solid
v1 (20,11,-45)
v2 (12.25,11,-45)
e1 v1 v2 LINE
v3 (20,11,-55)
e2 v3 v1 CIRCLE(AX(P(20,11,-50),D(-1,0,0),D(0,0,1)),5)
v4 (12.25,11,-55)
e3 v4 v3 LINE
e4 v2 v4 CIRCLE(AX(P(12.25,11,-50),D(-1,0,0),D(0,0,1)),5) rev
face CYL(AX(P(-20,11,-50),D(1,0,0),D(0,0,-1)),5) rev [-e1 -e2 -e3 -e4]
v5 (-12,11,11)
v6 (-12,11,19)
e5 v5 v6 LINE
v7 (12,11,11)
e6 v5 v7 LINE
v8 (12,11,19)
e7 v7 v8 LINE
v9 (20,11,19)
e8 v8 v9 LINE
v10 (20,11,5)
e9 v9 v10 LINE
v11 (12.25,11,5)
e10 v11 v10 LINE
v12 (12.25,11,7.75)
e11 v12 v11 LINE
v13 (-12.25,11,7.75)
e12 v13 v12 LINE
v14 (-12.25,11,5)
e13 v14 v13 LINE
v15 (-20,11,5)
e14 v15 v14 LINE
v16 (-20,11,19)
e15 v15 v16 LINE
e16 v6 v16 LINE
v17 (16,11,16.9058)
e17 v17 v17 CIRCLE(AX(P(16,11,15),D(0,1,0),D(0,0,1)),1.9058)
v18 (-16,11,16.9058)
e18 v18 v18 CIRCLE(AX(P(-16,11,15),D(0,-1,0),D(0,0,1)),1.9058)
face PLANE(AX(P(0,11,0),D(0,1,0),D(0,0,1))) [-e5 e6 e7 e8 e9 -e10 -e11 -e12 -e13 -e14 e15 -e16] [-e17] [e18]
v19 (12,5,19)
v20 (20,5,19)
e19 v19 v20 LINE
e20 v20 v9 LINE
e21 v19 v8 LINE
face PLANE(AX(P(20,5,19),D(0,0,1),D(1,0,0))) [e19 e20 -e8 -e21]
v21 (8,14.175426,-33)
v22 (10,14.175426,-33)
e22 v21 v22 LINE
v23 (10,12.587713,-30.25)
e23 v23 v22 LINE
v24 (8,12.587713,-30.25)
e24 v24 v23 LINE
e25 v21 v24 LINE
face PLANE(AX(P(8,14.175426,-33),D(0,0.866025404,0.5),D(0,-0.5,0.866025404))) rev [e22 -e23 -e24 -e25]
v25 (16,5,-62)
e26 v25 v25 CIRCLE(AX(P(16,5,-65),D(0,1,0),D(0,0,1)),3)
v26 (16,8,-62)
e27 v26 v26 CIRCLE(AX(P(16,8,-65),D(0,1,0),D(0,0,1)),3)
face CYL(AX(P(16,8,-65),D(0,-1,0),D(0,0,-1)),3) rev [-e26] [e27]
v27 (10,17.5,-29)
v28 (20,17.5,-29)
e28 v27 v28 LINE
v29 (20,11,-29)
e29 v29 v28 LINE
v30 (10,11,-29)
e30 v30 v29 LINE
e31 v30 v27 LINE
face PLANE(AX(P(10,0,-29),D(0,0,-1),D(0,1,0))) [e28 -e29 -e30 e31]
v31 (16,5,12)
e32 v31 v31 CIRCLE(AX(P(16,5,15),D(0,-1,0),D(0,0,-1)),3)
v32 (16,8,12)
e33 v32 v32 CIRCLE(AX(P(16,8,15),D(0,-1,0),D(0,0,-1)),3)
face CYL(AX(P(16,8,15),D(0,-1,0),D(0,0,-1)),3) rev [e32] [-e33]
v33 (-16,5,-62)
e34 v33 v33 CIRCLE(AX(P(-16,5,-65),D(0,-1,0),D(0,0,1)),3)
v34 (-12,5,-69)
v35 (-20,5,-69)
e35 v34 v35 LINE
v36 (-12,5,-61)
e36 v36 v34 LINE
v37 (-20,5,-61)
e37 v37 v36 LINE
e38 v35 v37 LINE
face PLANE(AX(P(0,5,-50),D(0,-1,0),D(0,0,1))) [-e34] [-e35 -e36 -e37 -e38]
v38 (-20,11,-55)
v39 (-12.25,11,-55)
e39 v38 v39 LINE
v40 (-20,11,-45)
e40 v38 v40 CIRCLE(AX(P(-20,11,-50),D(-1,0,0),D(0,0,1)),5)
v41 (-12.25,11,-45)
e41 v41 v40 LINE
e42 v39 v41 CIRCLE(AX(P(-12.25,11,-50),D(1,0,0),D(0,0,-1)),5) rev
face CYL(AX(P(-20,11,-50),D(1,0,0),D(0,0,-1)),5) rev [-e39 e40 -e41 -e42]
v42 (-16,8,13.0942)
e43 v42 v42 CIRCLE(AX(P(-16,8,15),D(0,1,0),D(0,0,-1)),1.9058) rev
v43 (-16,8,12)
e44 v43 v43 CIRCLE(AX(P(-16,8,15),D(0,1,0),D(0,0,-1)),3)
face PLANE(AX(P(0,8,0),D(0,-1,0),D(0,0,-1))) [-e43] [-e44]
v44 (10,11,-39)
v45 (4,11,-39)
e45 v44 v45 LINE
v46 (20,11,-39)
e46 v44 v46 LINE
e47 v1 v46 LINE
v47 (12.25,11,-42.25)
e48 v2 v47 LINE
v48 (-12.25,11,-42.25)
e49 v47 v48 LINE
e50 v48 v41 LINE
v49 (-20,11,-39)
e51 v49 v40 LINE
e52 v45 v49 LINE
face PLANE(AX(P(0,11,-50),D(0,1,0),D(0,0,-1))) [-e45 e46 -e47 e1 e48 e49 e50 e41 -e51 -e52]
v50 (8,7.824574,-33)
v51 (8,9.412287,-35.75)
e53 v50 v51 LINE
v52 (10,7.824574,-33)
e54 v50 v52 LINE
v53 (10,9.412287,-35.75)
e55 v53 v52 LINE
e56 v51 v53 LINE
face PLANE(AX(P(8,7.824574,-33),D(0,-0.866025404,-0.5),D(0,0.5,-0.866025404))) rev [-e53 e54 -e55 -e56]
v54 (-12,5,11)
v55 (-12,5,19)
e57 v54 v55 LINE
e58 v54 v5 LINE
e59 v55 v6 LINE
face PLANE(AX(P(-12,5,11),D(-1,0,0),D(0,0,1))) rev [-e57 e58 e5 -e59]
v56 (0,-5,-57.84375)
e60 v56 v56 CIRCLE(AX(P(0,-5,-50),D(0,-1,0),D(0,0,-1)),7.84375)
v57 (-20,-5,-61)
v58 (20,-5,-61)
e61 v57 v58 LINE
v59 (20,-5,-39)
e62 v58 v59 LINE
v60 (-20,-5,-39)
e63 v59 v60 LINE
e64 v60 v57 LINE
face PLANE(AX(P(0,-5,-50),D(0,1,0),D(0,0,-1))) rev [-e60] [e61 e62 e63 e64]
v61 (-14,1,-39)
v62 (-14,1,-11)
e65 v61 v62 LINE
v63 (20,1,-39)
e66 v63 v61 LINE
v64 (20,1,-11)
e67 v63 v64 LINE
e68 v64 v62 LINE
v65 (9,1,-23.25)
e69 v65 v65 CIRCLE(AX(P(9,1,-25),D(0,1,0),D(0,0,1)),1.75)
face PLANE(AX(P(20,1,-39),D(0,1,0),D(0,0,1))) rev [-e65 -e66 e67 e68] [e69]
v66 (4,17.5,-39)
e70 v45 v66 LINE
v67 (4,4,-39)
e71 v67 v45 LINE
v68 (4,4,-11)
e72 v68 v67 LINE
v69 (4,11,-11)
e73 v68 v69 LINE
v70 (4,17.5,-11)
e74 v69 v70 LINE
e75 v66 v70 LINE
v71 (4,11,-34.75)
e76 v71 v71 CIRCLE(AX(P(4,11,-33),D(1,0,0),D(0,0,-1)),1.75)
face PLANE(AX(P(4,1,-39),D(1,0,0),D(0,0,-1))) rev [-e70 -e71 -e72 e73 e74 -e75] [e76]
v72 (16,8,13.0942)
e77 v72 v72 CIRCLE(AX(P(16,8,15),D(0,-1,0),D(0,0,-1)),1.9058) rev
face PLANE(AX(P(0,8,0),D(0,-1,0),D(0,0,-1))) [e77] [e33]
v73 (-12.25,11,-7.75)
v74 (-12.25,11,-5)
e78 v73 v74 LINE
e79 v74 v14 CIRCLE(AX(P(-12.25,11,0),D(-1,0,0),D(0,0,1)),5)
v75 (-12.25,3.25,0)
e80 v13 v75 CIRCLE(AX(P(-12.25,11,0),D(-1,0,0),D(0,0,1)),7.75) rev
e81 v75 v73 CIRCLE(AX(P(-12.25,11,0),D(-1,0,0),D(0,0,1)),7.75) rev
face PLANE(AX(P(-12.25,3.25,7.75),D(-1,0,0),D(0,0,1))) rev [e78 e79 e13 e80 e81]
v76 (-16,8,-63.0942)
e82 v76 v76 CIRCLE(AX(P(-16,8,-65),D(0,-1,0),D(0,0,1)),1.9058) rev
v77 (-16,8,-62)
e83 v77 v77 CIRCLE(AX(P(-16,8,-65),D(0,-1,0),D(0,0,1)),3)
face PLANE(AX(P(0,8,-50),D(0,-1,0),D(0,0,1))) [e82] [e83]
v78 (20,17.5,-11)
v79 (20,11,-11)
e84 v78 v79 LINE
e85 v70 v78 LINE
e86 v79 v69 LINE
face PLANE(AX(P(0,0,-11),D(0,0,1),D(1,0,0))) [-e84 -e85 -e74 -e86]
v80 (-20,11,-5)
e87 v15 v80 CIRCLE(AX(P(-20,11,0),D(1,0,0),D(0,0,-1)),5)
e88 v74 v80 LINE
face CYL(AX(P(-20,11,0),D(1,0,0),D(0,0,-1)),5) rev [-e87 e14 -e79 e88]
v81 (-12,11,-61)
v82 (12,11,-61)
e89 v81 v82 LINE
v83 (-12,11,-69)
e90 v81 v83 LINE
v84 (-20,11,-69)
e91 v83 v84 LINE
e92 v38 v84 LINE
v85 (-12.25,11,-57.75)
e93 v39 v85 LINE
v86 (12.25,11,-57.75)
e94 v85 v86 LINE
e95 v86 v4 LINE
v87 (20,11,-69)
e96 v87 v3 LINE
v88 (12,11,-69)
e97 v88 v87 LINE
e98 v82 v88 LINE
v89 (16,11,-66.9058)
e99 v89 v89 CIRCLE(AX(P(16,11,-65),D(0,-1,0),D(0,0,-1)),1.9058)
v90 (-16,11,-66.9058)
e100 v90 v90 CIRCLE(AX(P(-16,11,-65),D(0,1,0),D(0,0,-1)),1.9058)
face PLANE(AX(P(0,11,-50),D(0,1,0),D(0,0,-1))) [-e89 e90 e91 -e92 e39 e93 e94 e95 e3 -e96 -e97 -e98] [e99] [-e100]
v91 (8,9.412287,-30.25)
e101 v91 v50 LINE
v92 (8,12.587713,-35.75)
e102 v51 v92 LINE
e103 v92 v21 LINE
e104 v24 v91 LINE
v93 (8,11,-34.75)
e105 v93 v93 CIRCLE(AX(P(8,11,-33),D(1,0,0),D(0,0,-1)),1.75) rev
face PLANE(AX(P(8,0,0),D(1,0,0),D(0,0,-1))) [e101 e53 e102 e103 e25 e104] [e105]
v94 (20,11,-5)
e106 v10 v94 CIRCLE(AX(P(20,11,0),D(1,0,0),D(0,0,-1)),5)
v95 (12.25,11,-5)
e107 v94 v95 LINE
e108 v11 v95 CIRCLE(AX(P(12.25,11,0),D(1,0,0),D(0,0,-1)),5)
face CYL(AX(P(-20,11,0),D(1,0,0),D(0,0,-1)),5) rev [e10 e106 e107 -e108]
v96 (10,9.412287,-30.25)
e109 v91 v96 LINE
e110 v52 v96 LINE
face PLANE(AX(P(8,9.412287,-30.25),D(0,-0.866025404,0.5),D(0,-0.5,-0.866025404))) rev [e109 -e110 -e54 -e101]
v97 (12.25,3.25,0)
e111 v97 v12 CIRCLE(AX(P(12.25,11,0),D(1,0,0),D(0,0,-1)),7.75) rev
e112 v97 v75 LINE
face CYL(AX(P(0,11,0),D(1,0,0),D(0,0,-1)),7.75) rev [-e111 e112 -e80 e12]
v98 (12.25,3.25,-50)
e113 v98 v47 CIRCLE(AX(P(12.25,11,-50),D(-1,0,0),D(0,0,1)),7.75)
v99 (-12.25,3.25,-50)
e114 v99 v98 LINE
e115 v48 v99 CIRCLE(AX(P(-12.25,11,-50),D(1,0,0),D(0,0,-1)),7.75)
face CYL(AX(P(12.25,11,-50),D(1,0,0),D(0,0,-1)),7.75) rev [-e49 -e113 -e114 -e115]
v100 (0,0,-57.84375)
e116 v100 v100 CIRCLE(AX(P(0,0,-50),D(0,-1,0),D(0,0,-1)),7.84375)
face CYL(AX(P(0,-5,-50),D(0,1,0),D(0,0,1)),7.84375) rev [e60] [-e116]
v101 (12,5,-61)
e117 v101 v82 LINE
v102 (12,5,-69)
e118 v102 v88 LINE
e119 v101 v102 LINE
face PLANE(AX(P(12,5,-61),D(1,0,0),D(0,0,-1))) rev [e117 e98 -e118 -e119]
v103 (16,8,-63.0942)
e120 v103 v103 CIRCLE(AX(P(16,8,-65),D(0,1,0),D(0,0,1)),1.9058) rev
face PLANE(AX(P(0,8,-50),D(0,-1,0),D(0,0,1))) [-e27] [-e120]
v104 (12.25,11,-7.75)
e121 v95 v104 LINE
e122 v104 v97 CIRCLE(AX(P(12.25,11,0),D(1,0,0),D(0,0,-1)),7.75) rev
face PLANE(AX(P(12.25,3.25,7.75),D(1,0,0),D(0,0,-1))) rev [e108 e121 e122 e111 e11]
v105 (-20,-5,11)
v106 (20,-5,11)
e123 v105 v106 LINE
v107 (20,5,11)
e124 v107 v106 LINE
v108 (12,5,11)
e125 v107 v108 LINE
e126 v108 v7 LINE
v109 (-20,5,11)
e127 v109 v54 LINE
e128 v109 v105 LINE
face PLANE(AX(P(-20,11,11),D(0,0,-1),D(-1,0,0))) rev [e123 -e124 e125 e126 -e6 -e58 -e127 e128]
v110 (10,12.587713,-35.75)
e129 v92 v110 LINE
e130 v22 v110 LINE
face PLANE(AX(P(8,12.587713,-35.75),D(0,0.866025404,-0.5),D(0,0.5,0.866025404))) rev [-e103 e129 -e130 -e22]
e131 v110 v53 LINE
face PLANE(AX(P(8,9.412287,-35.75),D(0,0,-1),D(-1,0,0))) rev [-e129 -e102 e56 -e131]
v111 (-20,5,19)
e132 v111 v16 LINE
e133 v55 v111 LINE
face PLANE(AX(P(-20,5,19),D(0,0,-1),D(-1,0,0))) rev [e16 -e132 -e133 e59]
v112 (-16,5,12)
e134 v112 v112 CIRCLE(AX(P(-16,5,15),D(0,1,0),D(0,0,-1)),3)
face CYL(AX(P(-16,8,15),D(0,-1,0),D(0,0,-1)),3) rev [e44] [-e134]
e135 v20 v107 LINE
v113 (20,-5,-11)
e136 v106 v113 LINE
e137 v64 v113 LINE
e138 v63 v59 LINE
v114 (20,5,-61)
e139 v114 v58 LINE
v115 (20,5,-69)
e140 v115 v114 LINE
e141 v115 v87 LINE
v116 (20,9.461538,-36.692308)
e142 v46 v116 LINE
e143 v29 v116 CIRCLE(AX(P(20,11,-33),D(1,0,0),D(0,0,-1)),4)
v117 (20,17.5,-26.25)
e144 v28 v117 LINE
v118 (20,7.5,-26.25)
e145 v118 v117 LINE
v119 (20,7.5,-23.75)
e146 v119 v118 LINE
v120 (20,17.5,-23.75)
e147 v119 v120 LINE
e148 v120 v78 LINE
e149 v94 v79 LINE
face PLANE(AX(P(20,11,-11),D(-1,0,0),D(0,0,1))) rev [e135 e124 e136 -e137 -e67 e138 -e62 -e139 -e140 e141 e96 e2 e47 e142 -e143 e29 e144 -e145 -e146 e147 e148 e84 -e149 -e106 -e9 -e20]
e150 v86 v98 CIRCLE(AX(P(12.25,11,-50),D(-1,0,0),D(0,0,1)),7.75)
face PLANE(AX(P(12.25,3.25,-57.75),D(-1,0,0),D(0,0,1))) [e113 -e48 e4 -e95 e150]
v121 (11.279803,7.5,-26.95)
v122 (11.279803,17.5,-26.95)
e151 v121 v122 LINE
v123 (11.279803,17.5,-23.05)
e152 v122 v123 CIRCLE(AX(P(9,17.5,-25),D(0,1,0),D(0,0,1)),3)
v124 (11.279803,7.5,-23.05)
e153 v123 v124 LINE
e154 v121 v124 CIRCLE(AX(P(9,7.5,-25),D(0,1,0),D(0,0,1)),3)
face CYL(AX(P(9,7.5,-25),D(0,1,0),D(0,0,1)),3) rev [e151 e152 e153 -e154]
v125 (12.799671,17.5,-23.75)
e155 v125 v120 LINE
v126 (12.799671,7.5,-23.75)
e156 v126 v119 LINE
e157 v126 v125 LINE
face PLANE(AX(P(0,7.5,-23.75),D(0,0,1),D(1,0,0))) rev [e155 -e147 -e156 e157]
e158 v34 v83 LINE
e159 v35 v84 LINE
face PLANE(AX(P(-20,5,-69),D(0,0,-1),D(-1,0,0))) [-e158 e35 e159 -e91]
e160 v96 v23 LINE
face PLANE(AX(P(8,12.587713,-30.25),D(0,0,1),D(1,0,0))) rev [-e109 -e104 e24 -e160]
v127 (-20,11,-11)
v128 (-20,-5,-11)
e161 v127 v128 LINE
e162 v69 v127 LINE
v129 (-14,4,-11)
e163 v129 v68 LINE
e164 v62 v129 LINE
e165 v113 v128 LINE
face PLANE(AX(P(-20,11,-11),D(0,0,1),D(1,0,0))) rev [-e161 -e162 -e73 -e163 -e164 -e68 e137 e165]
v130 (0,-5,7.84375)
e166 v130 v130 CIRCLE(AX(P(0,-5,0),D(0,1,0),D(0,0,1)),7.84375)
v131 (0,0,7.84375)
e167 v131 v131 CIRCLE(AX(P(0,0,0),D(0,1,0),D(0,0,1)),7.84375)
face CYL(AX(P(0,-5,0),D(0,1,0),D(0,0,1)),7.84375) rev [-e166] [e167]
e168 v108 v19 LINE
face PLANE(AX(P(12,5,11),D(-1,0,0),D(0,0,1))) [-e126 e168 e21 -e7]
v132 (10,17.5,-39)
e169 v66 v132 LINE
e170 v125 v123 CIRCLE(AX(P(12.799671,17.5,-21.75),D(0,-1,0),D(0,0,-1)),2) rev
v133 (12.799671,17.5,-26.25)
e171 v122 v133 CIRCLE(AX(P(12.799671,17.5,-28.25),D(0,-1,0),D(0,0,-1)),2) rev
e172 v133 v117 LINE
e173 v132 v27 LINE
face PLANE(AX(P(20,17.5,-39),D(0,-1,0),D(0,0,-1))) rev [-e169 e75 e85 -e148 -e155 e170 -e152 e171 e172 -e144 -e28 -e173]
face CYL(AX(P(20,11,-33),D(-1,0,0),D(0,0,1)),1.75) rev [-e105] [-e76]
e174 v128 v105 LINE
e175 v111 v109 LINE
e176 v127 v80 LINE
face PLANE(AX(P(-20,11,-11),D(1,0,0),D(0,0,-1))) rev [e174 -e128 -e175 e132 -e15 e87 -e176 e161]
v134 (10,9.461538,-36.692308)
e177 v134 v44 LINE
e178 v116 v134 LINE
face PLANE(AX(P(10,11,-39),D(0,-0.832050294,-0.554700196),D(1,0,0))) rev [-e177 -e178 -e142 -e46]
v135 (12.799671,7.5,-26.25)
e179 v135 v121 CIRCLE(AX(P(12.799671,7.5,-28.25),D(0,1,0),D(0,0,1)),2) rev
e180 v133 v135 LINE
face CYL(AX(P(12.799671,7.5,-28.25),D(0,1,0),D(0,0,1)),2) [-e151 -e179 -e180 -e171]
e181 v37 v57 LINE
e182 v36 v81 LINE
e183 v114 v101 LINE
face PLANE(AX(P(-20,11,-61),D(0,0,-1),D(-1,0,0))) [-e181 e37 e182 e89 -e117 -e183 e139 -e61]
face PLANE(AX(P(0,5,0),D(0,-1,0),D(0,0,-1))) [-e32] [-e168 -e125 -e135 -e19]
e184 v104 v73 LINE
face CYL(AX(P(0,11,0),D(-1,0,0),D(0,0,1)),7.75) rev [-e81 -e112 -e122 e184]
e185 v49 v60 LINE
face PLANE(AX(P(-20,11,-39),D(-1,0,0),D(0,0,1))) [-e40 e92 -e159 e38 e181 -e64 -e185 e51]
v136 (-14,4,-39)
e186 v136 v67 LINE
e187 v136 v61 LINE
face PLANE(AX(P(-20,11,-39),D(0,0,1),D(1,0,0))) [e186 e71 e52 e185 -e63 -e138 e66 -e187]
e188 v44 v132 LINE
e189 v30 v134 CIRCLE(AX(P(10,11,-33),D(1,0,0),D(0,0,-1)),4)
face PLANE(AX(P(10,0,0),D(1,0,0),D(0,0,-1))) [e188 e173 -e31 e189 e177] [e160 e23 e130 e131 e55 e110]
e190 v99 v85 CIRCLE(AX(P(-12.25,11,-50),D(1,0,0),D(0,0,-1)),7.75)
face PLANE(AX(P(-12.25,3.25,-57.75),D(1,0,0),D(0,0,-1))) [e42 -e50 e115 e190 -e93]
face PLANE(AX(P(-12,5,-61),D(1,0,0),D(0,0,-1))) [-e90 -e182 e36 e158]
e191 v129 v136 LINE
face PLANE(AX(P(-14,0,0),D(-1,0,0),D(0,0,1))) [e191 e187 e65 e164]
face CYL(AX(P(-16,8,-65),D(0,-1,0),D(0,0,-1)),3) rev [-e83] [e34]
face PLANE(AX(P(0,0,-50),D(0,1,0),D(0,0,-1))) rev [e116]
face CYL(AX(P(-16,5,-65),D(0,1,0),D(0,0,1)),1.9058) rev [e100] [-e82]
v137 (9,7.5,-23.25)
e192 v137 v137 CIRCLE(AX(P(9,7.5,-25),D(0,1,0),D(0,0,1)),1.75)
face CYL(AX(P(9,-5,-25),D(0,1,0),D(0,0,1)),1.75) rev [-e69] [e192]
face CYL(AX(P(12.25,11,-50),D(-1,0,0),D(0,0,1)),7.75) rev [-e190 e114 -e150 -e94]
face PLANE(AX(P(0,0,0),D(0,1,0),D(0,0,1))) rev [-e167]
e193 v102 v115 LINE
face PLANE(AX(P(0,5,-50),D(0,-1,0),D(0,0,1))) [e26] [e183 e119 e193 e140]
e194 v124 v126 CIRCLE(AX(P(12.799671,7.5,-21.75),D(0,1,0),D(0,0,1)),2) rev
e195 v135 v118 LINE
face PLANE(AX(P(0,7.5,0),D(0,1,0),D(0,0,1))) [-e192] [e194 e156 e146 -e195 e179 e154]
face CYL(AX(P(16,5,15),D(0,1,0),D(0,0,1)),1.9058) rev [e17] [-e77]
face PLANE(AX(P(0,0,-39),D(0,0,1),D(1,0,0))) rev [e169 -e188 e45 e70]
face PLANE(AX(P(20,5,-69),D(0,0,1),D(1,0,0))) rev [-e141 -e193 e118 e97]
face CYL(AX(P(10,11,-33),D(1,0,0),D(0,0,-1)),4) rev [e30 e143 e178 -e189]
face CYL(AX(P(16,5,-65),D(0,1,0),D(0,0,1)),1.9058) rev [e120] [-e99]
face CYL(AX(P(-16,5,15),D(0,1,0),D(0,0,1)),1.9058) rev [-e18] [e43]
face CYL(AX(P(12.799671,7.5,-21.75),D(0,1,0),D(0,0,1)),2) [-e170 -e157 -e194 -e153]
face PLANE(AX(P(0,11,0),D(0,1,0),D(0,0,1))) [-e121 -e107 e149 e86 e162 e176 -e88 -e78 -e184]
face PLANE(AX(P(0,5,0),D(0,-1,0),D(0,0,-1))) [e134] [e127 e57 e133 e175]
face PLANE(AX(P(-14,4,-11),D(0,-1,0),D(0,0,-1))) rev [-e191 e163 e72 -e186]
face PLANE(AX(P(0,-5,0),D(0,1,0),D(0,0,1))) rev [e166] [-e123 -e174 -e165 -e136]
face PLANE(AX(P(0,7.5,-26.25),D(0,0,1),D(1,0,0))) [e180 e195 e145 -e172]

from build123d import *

# Parameters (mm, degrees)
SKETCH1_W                  = 40
SKETCH1_H                  = 22
BOSS_EXTRUDE1_DEPTH        = 11
SKETCH2_W                  = 40
SKETCH2_H                  = 22
SKETCH2_R                  = 7.843750423
BOSS_EXTRUDE2_DEPTH        = 5
SKETCH3_W                  = 24.5
SKETCH3_H                  = 15.5
CUT_EXTRUDE1_DEPTH         = 7.75
FILLET1_R                  = 7.75
SKETCH4_R                  = 5
CUT_EXTRUDE2_DEPTH         = 36.805900352
SKETCH5_W                  = 8
SKETCH5_H                  = 8
SKETCH5_R                  = 1.905800151
BOSS_EXTRUDE3_DEPTH        = 6
CUT_EXTRUDE3_START         = -3
SKETCH6_R                  = 3
SKETCH6_R_2                = 1.905800151
CUT_EXTRUDE3_DEPTH         = 3
SKETCH7_W                  = 16
SKETCH7_H                  = 16.5
BOSS_EXTRUDE5_DEPTH        = 28
MIRROR14_COPY_1_SKETCH_W   = 8
MIRROR14_COPY_1_SKETCH_H   = 8
MIRROR14_COPY_1_SKETCH_R   = 1.905800151
MIRROR14_COPY_1_DEPTH      = 6
MIRROR14_START             = -3
MIRROR14_COPY_2_SKETCH_R   = 3
MIRROR14_COPY_2_SKETCH_R_2 = 1.905800151
MIRROR14_COPY_2_DEPTH      = 3
FILLET1_OF_MIRROR14_R      = 7.75
SKETCH9_W                  = 28
SKETCH9_H                  = 3
BOSS_EXTRUDE6_DEPTH        = 18
CUT_EXTRUDE4_DEPTH         = 10
CUT_EXTRUDE5_DEPTH         = 73.919476136
CUT_EXTRUDE5_DEPTH_BACK    = 73.919476136
SKETCH11_R                 = 1.75
CUT_EXTRUDE6_DEPTH         = 76.121568141
CUT_EXTRUDE6_DEPTH_BACK    = 76.121568141
SKETCH12_R                 = 1.75
CUT_EXTRUDE9_DEPTH         = 12
CUT_EXTRUDE11_START        = -10
SKETCH16_R                 = 4
SKETCH16_R_2               = 1.75
SKETCH16_W                 = 10
SKETCH16_H                 = 6.5
CUT_EXTRUDE11_DEPTH        = 10
FILLET2_R                  = 2


# Some blends are built 0.0001 mm under size
with BuildPart() as part:
    # Sketch1 → Boss-Extrude1 (new body)
    with BuildSketch(Plane(origin=(0, 0, 0), x_dir=(1, 0, 0), z_dir=(0, 1, 0))):
        Rectangle(SKETCH1_W, SKETCH1_H)
    boss_extrude1 = extrude(amount=BOSS_EXTRUDE1_DEPTH)

    # Sketch2 → Boss-Extrude2 (add)
    with BuildSketch(Plane(origin=(0, 0, 0), x_dir=(1, 0, 0), z_dir=(0, 1, 0))):
        Rectangle(SKETCH2_W, SKETCH2_H)
        with Locations(Location((0, 0, 0), (0, 0, 270))):
            Circle(SKETCH2_R, mode=Mode.SUBTRACT)
    boss_extrude2 = extrude(amount=-BOSS_EXTRUDE2_DEPTH)

    # Sketch3 → Cut-Extrude1 (cut)
    with BuildSketch(Plane(origin=(0, 11, 0), x_dir=(1, 0, 0), z_dir=(0, 1, 0))):
        Rectangle(SKETCH3_W, SKETCH3_H)
    cut_extrude1 = extrude(amount=-CUT_EXTRUDE1_DEPTH, mode=Mode.SUBTRACT)

    # Fillet1
    fillet1_edges = [part.edges().sort_by_distance(p)[0] for p in [
        (0, 3.25, 7.75),
        (0, 3.25, -7.75),
    ]]
    fillet(fillet1_edges, radius=FILLET1_R - 0.0001)  # a hair under: the kernel refuses the full size

    # Sketch4 → Cut-Extrude2 (cut, symmetric)
    with BuildSketch(Plane(origin=(-12.25, 0, 0), x_dir=(0, 0, -1), z_dir=(1, 0, 0))):
        with Locations((0, 11)):
            Circle(SKETCH4_R)
    cut_extrude2 = extrude(amount=CUT_EXTRUDE2_DEPTH, both=True, mode=Mode.SUBTRACT)

    # Sketch5 → Boss-Extrude3 (add)
    with BuildSketch(Plane(origin=(0, 11, 0), x_dir=(1, 0, 0), z_dir=(0, 1, 0))):
        with Locations((16, -15)):
            Rectangle(SKETCH5_W, SKETCH5_H)
        with Locations(Location((16, -15, 0), (0, 0, 270))):
            Circle(SKETCH5_R, mode=Mode.SUBTRACT)
    boss_extrude3 = extrude(amount=-BOSS_EXTRUDE3_DEPTH)

    # Sketch6 → Cut-Extrude3 (cut)
    with BuildSketch(Plane.XZ.offset(-5).offset(CUT_EXTRUDE3_START)):
        with Locations(Location((16, 15, 0), (0, 0, 270))):
            Circle(SKETCH6_R)
        with Locations(Location((16, 15, 0), (0, 0, 90))):
            Circle(SKETCH6_R_2, mode=Mode.SUBTRACT)
    cut_extrude3 = extrude(amount=CUT_EXTRUDE3_DEPTH, mode=Mode.SUBTRACT)

    # Mirror8: Boss-Extrude3, Cut-Extrude3 across plane
    add(boss_extrude3.mirror(Plane(origin=(0, 0, 0), x_dir=(0, 0, 1), z_dir=(1, 0, 0))))
    add(cut_extrude3.mirror(Plane(origin=(0, 0, 0), x_dir=(0, 0, 1), z_dir=(1, 0, 0))), mode=Mode.SUBTRACT)

    # Sketch7 → Boss-Extrude5 (add)
    with BuildSketch(Plane(origin=(0, 0, -11), x_dir=(-1, 0, 0), z_dir=(0, 0, -1))):
        with Locations((-12, 9.25)):
            Rectangle(SKETCH7_W, SKETCH7_H)
    extrude(amount=BOSS_EXTRUDE5_DEPTH)

    # Mirror14: Boss-Extrude1, Boss-Extrude2, Cut-Extrude1, Cut-Extrude2, Boss-Extrude3, Cut-Extrude3 across plane
    add(boss_extrude1.mirror(Plane.XY.offset(-25)))
    add(boss_extrude2.mirror(Plane.XY.offset(-25)))
    add(cut_extrude1.mirror(Plane.XY.offset(-25)), mode=Mode.SUBTRACT)
    add(cut_extrude2.mirror(Plane.XY.offset(-25)), mode=Mode.SUBTRACT)
    add(boss_extrude3.mirror(Plane.XY.offset(-25)))
    add(cut_extrude3.mirror(Plane.XY.offset(-25)), mode=Mode.SUBTRACT)

    # Mirror14 copy 1 sketch → Mirror14 copy 1 (add)
    with BuildSketch(Plane(origin=(0, 11, -50), x_dir=(-1, 0, 0), z_dir=(0, 1, 0))):
        with Locations((16, -15)):
            Rectangle(MIRROR14_COPY_1_SKETCH_W, MIRROR14_COPY_1_SKETCH_H)
        with Locations(Location((16, -15, 0), (0, 0, 270))):
            Circle(MIRROR14_COPY_1_SKETCH_R, mode=Mode.SUBTRACT)
    extrude(amount=-MIRROR14_COPY_1_DEPTH)

    # Mirror14 copy 2 sketch → Mirror14 copy 2 (cut)
    with BuildSketch(Plane(origin=(0, 5, -50), x_dir=(-1, 0, 0), z_dir=(0, -1, 0)).offset(MIRROR14_START)):
        with Locations(Location((16, 15, 0), (0, 0, 270))):
            Circle(MIRROR14_COPY_2_SKETCH_R)
        with Locations(Location((16, 15, 0), (0, 0, 90))):
            Circle(MIRROR14_COPY_2_SKETCH_R_2, mode=Mode.SUBTRACT)
    extrude(amount=MIRROR14_COPY_2_DEPTH, mode=Mode.SUBTRACT)

    # Fillet1 of Mirror14
    fillet1_of_mirror14_edges = [part.edges().sort_by_distance(p)[0] for p in [
        (0, 3.25, -57.75),
        (0, 3.25, -42.25),
    ]]
    fillet(fillet1_of_mirror14_edges, radius=FILLET1_OF_MIRROR14_R - 0.0001)  # a hair under: the kernel refuses the full size

    # Sketch9 → Boss-Extrude6 (add)
    with BuildSketch(Plane.ZY.offset(-4)):
        with Locations((-25, 2.5)):
            Rectangle(SKETCH9_W, SKETCH9_H)
    extrude(amount=BOSS_EXTRUDE6_DEPTH)

    # Sketch10 → Cut-Extrude4 (cut)
    with BuildSketch(Plane(origin=(0, 17.5, 0), x_dir=(1, 0, 0), z_dir=(0, 1, 0))):
        with BuildLine():
            Line((9, 26.25), (9, 23.75))
            Line((9, 23.75), (11.727178029, 23.75))
            ThreePointArc((11.727178029, 23.75), (11.931001031, 24.360286817), (12, 25))
            ThreePointArc((12, 25), (11.931001031, 25.639713183), (11.727178029, 26.25))
            Line((11.727178029, 26.25), (9, 26.25))
        make_face()
        with BuildLine():
            Line((11.727178029, 23.75), (9, 23.75))
            Line((9, 23.75), (9, 26.25))
            Line((9, 26.25), (11.727178029, 26.25))
            ThreePointArc((11.727178029, 26.25), (6, 25), (11.727178029, 23.75))
        make_face()
        with BuildLine():
            ThreePointArc((12, 25), (11.931001031, 24.360286817), (11.727178029, 23.75))
            Line((11.727178029, 23.75), (20, 23.75))
            Line((20, 23.75), (20, 26.25))
            Line((20, 26.25), (11.727178029, 26.25))
            ThreePointArc((11.727178029, 26.25), (11.931001031, 25.639713183), (12, 25))
        make_face()
    extrude(amount=-CUT_EXTRUDE4_DEPTH, mode=Mode.SUBTRACT)

    # Sketch11 → Cut-Extrude5 (cut, two sides: drawn at the far end of the back side and taken through both)
    with BuildSketch(Plane(origin=(0, 7.5, 0), x_dir=(1, 0, 0), z_dir=(0, 1, 0)).offset(-CUT_EXTRUDE5_DEPTH_BACK)):
        with Locations(Location((9, 25, 0), (0, 0, 270))):
            Circle(SKETCH11_R)
    extrude(amount=CUT_EXTRUDE5_DEPTH + CUT_EXTRUDE5_DEPTH_BACK, mode=Mode.SUBTRACT)

    # Sketch12 → Cut-Extrude6 (cut, two sides: drawn at the far end of the back side and taken through both)
    with BuildSketch(Plane.ZY.offset(-4).offset(-CUT_EXTRUDE6_DEPTH_BACK)):
        with Locations((-33, 11)):
            Circle(SKETCH12_R)
    extrude(amount=CUT_EXTRUDE6_DEPTH + CUT_EXTRUDE6_DEPTH_BACK, mode=Mode.SUBTRACT)

    # Sketch15 → Cut-Extrude9 (cut)
    with BuildSketch(Plane(origin=(20, 0, 0), x_dir=(0, 0, -1), z_dir=(1, 0, 0))):
        Polygon((33, 14.175426481), (30.25, 12.58771324), (30.25, 9.41228676), (33, 7.824573519), (35.75, 9.41228676), (35.75, 12.58771324), align=None)
    extrude(amount=-CUT_EXTRUDE9_DEPTH, mode=Mode.SUBTRACT)

    # Sketch16 → Cut-Extrude11 (cut)
    # profile 1 of 2: a face of its own
    with BuildSketch(Plane(origin=(20, 0, 0), x_dir=(0, 0, -1), z_dir=(1, 0, 0)).offset(CUT_EXTRUDE11_START)):
        with Locations((33, 11)):
            Circle(SKETCH16_R)
        with Locations((33, 11)):
            Circle(SKETCH16_R_2, mode=Mode.SUBTRACT)
    # profile 2 of 2: a face of its own
    with BuildSketch(Plane(origin=(20, 0, 0), x_dir=(0, 0, -1), z_dir=(1, 0, 0)).offset(CUT_EXTRUDE11_START)):
        with Locations((34, 14.25)):
            Rectangle(SKETCH16_W, SKETCH16_H)
    extrude(amount=CUT_EXTRUDE11_DEPTH, mode=Mode.SUBTRACT)

    # Chamfer3
    # the kernel refuses this chamfer: 2.5 mm, written as the material it takes off along each edge
    with BuildSketch(Plane(origin=(4.790141486, 11, -37), x_dir=(0, -0.9712202897009368, 0.23818301550116588), z_dir=(1, 0, 0))) as chamfer3_piece_1_section:
        with BuildLine():
            Line((1.641163776, 0), (-0.550057664, 2.010038976))
            Line((-0.550057664, 2.010038976), (-0.598618679, 1.998129825))
            ThreePointArc((-0.598618679, 1.998129825), (-0.296653042, 0.999716345), (-0.048561014, -0.011909151))
            Line((-0.048561014, -0.011909151), (0.011909151, -0.048561014))
            ThreePointArc((0.011909151, -0.048561014), (0.818444442, 0.062835502), (1.633479525, -0.049405994))
            Line((1.633479525, -0.049405994), (1.641163776, 0))
        make_face()
    chamfer3_piece_1 = extrude(amount=20.419717028, mode=Mode.PRIVATE)
    chamfer3_piece_1 = split(chamfer3_piece_1, bisect_by=Plane(origin=(10, 11.063270064, -39.03704072), z_dir=(-1, 0, 0)), keep=Keep.TOP, mode=Mode.PRIVATE)
    chamfer3_piece_1 = split(chamfer3_piece_1, bisect_by=Plane(origin=(7.395070743, 11.063270064, -39), z_dir=(0, 0, -1)), keep=Keep.TOP, mode=Mode.PRIVATE)
    add(chamfer3_piece_1, mode=Mode.SUBTRACT)
    with BuildSketch(Plane(origin=(10, 11, -37), x_dir=(0, -0.9712202897009377, 0.23818301550116178), z_dir=(1, 0, 0))) as chamfer3_piece_2_section:
        with BuildLine():
            Line((1.641163776, 0), (-0.550057664, 2.010038976))
            Line((-0.550057664, 2.010038976), (-0.598618679, 1.998129825))
            ThreePointArc((-0.598618679, 1.998129825), (-0.296653042, 0.999716345), (-0.048561014, -0.011909151))
            Line((-0.048561014, -0.011909151), (0.011909151, -0.048561014))
            ThreePointArc((0.011909151, -0.048561014), (0.818444442, 0.062835502), (1.633479525, -0.049405994))
            Line((1.633479525, -0.049405994), (1.641163776, 0))
        make_face()
    chamfer3_piece_2 = extrude(amount=15.209858514, mode=Mode.PRIVATE)
    chamfer3_piece_2 = split(chamfer3_piece_2, bisect_by=Plane(origin=(17.604929257, 10.514615405, -39), z_dir=(0, 0, 1)), keep=Keep.TOP, mode=Mode.PRIVATE)
    add(chamfer3_piece_2, mode=Mode.SUBTRACT)
    with BuildSketch(Plane(origin=(10, 11, -37), x_dir=(0, -0.9712202897009377, 0.23818301550116178), z_dir=(1, 0, 0))) as chamfer3_piece_3_section:
        with BuildLine():
            Line((1.641163776, 0), (-0.550057664, 2.010038976))
            Line((-0.550057664, 2.010038976), (-0.598618679, 1.998129825))
            ThreePointArc((-0.598618679, 1.998129825), (-0.296653042, 0.999716345), (-0.048561014, -0.011909151))
            Line((-0.048561014, -0.011909151), (0.011909151, -0.048561014))
            ThreePointArc((0.011909151, -0.048561014), (0.818444442, 0.062835502), (1.633479525, -0.049405994))
            Line((1.633479525, -0.049405994), (1.641163776, 0))
        make_face()
    chamfer3_piece_3 = extrude(amount=15.209858514, mode=Mode.PRIVATE)
    chamfer3_piece_3 = split(chamfer3_piece_3, bisect_by=Plane(origin=(17.604929257, 11.063270064, -39), z_dir=(0, 0, -1)), keep=Keep.TOP, mode=Mode.PRIVATE)
    add(chamfer3_piece_3, mode=Mode.SUBTRACT)

    # Fillet2
    fillet2_edges = [part.edges().sort_by_distance(p)[0] for p in [
        (11.727178029, 12.5, -23.75),
        (11.727178029, 12.5, -26.25),
    ]]
    fillet(fillet2_edges, radius=FILLET2_R)


solid = part.part
